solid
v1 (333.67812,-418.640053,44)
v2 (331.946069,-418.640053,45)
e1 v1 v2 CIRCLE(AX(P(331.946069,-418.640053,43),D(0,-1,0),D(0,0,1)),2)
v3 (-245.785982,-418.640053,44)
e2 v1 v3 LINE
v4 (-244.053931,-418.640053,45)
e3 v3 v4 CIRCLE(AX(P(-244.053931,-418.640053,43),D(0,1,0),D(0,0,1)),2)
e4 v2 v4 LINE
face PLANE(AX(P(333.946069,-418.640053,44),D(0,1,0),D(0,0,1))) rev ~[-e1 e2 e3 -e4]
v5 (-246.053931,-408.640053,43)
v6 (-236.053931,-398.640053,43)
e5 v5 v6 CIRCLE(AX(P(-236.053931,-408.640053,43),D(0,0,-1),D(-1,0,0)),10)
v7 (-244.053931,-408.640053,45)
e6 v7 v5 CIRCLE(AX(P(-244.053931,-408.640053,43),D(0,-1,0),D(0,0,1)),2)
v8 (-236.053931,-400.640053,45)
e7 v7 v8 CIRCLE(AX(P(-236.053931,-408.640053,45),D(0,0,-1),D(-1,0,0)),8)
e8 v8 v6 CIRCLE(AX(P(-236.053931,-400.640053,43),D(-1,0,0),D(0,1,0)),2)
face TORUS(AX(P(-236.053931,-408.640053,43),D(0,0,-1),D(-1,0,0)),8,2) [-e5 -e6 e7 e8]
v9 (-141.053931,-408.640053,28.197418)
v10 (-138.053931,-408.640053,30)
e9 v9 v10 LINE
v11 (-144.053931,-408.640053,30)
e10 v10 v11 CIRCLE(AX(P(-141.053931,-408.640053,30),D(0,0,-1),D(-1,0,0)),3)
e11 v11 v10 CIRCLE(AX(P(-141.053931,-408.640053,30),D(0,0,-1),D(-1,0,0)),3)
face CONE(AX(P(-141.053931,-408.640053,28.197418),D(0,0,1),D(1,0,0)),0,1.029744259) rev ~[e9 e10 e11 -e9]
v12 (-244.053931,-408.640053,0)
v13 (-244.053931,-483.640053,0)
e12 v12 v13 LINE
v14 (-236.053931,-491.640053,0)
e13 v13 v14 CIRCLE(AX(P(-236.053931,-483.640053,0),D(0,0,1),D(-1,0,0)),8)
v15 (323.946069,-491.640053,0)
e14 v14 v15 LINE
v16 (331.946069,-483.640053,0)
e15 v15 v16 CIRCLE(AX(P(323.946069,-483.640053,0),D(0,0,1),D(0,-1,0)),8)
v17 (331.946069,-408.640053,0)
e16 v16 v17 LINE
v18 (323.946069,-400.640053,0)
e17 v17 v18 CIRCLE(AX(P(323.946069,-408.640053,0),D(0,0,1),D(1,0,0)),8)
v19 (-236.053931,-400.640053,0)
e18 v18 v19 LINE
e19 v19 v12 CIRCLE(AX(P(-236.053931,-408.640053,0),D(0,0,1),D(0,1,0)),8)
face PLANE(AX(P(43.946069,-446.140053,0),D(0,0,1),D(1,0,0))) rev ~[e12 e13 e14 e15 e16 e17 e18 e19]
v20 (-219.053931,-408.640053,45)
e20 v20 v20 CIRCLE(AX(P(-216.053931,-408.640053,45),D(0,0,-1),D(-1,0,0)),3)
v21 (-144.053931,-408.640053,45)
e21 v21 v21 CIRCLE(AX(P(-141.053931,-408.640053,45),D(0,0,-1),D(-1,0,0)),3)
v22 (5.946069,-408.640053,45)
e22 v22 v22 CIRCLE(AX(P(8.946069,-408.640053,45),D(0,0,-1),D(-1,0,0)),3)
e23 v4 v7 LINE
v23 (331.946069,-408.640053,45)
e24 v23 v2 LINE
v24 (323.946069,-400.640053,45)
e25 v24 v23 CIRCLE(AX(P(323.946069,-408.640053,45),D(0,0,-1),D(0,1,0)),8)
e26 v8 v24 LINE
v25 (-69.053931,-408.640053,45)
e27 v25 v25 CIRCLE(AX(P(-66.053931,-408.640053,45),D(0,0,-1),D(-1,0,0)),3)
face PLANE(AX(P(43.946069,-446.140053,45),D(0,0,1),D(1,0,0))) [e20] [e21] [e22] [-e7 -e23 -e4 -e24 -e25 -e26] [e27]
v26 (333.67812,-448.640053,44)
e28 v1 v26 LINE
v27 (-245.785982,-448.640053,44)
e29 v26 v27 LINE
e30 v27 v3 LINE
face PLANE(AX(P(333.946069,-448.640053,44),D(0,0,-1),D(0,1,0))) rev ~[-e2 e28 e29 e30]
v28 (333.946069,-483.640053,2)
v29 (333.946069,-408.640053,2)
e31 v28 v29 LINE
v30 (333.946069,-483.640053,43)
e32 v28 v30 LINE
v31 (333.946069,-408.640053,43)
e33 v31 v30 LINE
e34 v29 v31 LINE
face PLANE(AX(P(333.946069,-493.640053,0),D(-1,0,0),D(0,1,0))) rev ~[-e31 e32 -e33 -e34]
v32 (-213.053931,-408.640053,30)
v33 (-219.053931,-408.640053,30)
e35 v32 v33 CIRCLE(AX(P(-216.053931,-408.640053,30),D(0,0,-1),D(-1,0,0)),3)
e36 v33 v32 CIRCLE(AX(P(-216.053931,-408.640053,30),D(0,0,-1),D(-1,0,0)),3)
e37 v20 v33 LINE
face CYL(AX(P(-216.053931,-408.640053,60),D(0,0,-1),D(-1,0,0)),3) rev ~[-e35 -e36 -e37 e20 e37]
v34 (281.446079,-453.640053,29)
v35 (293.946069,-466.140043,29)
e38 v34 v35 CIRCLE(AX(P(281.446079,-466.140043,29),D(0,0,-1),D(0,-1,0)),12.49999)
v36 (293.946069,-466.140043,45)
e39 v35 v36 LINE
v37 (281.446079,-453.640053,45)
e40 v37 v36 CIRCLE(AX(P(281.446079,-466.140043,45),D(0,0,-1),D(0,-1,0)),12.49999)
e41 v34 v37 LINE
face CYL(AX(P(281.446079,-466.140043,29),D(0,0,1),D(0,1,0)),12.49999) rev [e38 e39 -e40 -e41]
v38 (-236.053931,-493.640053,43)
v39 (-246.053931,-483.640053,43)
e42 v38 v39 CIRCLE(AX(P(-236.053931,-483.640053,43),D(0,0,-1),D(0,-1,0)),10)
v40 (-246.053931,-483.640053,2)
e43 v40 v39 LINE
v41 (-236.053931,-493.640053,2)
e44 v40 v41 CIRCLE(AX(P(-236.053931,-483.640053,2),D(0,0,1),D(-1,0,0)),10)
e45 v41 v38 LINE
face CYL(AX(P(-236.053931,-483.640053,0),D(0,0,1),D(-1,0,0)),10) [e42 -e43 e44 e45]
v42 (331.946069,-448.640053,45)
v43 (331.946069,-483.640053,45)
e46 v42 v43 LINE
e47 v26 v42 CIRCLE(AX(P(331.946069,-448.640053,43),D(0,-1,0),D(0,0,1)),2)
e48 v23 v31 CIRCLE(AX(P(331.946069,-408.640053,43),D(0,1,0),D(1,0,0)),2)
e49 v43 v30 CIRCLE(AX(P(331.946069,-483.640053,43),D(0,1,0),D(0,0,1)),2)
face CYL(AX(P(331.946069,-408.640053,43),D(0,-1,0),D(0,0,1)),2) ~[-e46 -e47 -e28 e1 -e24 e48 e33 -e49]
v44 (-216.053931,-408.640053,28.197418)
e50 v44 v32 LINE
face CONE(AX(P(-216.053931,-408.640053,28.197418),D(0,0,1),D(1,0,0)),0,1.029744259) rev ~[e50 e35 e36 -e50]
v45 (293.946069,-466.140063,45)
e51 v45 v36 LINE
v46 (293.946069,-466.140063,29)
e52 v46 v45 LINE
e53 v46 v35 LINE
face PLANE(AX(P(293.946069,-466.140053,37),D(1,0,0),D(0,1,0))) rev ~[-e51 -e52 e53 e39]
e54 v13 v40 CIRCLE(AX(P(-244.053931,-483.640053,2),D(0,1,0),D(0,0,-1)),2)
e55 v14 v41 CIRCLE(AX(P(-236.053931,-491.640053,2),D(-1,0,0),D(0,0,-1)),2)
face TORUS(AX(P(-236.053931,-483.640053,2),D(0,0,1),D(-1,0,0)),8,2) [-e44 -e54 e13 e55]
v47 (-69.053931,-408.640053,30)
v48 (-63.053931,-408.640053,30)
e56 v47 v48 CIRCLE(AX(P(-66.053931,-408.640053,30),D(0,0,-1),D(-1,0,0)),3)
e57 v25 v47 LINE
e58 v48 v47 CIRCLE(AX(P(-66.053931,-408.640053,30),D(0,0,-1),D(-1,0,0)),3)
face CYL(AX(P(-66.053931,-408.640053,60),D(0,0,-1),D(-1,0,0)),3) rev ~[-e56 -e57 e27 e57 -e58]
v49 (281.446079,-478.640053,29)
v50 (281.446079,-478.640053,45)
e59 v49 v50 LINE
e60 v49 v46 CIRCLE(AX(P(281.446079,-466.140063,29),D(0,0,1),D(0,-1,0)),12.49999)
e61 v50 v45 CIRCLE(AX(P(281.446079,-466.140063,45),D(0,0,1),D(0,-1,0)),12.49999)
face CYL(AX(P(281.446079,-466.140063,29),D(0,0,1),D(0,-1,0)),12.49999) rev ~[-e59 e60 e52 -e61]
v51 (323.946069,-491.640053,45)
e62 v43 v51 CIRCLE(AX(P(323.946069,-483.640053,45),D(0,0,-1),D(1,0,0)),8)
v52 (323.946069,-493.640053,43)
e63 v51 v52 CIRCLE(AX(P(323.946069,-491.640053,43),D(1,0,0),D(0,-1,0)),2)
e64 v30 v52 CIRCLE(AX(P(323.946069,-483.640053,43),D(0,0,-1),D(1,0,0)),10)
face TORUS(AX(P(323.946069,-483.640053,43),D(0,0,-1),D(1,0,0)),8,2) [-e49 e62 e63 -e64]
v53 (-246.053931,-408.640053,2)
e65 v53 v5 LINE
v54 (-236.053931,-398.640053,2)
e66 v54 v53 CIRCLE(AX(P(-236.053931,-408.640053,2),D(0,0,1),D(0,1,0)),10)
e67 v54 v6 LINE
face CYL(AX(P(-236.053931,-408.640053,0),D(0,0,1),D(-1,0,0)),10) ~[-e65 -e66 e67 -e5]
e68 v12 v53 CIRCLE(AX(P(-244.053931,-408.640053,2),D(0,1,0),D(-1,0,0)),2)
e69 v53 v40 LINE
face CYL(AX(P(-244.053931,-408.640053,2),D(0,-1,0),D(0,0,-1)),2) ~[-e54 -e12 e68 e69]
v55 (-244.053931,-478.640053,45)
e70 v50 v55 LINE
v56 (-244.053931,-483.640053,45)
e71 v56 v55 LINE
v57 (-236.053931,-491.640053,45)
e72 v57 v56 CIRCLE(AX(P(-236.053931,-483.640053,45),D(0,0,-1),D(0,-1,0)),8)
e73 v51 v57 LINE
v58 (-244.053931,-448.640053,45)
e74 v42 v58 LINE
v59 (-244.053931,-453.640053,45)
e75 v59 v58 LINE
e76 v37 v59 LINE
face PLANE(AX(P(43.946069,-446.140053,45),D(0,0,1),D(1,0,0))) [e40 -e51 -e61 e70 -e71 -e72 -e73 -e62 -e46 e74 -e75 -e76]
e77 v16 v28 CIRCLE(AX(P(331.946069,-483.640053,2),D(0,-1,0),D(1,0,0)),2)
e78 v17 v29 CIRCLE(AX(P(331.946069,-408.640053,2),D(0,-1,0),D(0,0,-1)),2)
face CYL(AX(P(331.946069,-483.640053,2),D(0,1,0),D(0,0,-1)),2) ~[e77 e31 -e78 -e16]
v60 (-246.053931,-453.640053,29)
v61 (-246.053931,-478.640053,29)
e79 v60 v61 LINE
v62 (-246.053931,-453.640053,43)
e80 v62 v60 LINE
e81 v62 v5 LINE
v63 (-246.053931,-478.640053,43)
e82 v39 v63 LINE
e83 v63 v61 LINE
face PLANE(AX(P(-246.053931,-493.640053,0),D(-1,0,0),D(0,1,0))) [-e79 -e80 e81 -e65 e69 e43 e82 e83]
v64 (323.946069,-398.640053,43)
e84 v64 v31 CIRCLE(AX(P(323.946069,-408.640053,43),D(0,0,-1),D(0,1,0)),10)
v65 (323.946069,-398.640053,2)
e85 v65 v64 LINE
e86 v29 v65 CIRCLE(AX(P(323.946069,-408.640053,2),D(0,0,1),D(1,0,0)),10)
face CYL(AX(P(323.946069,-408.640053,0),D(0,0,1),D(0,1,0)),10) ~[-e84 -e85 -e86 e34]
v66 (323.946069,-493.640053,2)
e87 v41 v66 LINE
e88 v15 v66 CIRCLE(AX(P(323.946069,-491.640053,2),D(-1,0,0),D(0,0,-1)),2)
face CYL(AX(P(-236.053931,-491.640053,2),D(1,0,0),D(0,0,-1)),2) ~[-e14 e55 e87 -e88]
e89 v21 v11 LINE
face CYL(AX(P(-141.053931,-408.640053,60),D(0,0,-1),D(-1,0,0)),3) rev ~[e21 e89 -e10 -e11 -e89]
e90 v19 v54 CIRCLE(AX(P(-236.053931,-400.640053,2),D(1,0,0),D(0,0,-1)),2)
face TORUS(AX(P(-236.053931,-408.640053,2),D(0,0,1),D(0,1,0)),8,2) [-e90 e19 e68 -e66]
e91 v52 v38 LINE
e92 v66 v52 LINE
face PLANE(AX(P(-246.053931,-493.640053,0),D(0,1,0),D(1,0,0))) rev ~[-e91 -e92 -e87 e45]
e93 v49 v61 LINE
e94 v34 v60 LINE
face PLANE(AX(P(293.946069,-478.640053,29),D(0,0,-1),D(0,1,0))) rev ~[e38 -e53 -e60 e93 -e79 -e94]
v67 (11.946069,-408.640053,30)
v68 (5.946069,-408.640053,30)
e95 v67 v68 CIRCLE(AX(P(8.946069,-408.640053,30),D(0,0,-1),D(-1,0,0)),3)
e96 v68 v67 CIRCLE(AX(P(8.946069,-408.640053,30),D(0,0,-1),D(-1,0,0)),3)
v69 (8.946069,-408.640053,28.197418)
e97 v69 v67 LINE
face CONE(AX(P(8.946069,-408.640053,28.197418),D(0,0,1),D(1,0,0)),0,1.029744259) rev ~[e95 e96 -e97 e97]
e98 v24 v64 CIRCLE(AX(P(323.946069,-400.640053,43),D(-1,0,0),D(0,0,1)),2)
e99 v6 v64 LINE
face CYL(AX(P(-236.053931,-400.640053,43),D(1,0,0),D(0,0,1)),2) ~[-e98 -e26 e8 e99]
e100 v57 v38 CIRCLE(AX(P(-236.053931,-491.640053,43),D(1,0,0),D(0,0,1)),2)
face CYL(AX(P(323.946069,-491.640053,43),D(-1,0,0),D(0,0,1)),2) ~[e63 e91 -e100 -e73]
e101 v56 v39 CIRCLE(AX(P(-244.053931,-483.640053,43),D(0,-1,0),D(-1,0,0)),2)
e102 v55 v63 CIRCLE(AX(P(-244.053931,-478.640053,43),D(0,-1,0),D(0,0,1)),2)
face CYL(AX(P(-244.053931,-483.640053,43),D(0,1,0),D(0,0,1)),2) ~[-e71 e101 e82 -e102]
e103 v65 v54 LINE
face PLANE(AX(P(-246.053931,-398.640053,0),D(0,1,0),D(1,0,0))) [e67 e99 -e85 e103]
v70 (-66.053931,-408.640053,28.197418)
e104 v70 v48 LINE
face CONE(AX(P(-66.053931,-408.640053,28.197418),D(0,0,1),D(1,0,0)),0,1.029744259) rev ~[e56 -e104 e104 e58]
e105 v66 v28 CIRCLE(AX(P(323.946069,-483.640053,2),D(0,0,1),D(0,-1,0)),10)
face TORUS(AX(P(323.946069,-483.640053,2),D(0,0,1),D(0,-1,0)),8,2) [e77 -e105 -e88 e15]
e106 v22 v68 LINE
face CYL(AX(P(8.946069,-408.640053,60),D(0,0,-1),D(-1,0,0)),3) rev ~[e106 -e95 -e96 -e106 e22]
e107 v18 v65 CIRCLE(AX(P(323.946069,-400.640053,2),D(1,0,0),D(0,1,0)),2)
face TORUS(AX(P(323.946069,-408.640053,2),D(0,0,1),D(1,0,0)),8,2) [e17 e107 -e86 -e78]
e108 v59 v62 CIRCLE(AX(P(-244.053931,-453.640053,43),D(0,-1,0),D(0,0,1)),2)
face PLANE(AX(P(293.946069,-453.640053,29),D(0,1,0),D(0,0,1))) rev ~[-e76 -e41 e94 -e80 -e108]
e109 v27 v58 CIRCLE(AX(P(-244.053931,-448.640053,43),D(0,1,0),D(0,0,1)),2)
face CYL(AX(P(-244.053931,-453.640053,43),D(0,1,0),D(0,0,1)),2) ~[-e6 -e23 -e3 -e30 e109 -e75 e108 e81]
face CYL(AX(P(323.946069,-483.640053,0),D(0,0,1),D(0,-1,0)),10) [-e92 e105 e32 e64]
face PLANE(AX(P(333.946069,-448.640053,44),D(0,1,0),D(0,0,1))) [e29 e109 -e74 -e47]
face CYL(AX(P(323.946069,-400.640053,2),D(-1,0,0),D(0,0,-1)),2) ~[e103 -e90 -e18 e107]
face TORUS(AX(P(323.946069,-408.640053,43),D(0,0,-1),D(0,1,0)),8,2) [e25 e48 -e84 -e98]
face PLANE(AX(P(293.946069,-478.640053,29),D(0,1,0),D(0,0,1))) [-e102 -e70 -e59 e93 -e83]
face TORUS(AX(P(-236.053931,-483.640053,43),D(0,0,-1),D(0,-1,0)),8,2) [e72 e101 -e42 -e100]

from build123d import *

# Parameters (mm, degrees)
F0_W      = 580
F0_H      = 95
F1_DEPTH  = 45
F3_START  = -40
F2_W      = 25
F2_H      = 16
F3_DEPTH  = 540.001
F6_D      = 6
F6_DEPTH  = 15
F6_TIP    = 1.8025818571
F7_R      = 10
F8_R      = 2
F9_R      = 12.49999
F5_W      = 30
F5_H      = 1
F10_DEPTH = 580.0010001


# Not quite as in the source:
# - a fillet or chamfer is up to 0.001 mm smaller than in the source, because OpenCascade refuses the exact size


with BuildPart() as f1:
    # F0 (on Top) → F1 (new body)
    with BuildSketch(Plane.XY):
        with Locations((43.9460686967, -446.140053056)):
            Rectangle(F0_W, F0_H)
    extrude(amount=F1_DEPTH)

    # F2 (on face) → F3 (cut)
    with BuildSketch(Plane.YZ.offset(333.9460686967).offset(F3_START)):
        with Locations((-466.140053056, 37)):
            Rectangle(F2_W, F2_H)
    extrude(amount=-F3_DEPTH, mode=Mode.SUBTRACT)

    # F6
    with Locations(Plane.XY.offset(45)):
        with Locations((-216.0539313033, -408.640053056), (-141.0539313033, -408.640053056), (-66.0539313033, -408.640053056), (8.9460686967, -408.640053056)):
            Hole(F6_D / 2, depth=F6_DEPTH)
            with Locations((0, 0, -(F6_DEPTH + F6_TIP / 2))):  # 118° drill point
                Cone(0, F6_D / 2, F6_TIP, mode=Mode.SUBTRACT)

    # F7
    f7_edges = [f1.edges().sort_by_distance(p)[0] for p in [
        (-246.053931, -493.640053, 22.5),
        (333.946069, -493.640053, 22.5),
        (333.946069, -398.640053, 22.5),
        (-246.053931, -398.640053, 22.5),
    ]]
    fillet(f7_edges, radius=F7_R)

    # F8
    f8_edges = [f1.edges().sort_by_distance(p)[0] for p in [
        (43.946069, -398.640053, 45),
        (43.946069, -493.640053, 45),
        (43.946069, -493.640053, 0),
    ]]
    fillet(f8_edges, radius=F8_R)

    # F9 (radius 12.5 in the source; OpenCascade refuses exactly that, so slightly less here)
    f9_edges = [f1.edges().sort_by_distance(p)[0] for p in [
        (293.946069, -453.640053, 37),
        (293.946069, -478.640053, 37),
    ]]
    fillet(f9_edges, radius=F9_R)

    # F5 (on face) → F10 (cut, through all)
    with BuildSketch(Plane.YZ.offset(333.9460686967)):
        with Locations((-433.640053056, 44.5)):
            Rectangle(F5_W, F5_H)
    extrude(amount=-F10_DEPTH, mode=Mode.SUBTRACT)


solid = f1.part
